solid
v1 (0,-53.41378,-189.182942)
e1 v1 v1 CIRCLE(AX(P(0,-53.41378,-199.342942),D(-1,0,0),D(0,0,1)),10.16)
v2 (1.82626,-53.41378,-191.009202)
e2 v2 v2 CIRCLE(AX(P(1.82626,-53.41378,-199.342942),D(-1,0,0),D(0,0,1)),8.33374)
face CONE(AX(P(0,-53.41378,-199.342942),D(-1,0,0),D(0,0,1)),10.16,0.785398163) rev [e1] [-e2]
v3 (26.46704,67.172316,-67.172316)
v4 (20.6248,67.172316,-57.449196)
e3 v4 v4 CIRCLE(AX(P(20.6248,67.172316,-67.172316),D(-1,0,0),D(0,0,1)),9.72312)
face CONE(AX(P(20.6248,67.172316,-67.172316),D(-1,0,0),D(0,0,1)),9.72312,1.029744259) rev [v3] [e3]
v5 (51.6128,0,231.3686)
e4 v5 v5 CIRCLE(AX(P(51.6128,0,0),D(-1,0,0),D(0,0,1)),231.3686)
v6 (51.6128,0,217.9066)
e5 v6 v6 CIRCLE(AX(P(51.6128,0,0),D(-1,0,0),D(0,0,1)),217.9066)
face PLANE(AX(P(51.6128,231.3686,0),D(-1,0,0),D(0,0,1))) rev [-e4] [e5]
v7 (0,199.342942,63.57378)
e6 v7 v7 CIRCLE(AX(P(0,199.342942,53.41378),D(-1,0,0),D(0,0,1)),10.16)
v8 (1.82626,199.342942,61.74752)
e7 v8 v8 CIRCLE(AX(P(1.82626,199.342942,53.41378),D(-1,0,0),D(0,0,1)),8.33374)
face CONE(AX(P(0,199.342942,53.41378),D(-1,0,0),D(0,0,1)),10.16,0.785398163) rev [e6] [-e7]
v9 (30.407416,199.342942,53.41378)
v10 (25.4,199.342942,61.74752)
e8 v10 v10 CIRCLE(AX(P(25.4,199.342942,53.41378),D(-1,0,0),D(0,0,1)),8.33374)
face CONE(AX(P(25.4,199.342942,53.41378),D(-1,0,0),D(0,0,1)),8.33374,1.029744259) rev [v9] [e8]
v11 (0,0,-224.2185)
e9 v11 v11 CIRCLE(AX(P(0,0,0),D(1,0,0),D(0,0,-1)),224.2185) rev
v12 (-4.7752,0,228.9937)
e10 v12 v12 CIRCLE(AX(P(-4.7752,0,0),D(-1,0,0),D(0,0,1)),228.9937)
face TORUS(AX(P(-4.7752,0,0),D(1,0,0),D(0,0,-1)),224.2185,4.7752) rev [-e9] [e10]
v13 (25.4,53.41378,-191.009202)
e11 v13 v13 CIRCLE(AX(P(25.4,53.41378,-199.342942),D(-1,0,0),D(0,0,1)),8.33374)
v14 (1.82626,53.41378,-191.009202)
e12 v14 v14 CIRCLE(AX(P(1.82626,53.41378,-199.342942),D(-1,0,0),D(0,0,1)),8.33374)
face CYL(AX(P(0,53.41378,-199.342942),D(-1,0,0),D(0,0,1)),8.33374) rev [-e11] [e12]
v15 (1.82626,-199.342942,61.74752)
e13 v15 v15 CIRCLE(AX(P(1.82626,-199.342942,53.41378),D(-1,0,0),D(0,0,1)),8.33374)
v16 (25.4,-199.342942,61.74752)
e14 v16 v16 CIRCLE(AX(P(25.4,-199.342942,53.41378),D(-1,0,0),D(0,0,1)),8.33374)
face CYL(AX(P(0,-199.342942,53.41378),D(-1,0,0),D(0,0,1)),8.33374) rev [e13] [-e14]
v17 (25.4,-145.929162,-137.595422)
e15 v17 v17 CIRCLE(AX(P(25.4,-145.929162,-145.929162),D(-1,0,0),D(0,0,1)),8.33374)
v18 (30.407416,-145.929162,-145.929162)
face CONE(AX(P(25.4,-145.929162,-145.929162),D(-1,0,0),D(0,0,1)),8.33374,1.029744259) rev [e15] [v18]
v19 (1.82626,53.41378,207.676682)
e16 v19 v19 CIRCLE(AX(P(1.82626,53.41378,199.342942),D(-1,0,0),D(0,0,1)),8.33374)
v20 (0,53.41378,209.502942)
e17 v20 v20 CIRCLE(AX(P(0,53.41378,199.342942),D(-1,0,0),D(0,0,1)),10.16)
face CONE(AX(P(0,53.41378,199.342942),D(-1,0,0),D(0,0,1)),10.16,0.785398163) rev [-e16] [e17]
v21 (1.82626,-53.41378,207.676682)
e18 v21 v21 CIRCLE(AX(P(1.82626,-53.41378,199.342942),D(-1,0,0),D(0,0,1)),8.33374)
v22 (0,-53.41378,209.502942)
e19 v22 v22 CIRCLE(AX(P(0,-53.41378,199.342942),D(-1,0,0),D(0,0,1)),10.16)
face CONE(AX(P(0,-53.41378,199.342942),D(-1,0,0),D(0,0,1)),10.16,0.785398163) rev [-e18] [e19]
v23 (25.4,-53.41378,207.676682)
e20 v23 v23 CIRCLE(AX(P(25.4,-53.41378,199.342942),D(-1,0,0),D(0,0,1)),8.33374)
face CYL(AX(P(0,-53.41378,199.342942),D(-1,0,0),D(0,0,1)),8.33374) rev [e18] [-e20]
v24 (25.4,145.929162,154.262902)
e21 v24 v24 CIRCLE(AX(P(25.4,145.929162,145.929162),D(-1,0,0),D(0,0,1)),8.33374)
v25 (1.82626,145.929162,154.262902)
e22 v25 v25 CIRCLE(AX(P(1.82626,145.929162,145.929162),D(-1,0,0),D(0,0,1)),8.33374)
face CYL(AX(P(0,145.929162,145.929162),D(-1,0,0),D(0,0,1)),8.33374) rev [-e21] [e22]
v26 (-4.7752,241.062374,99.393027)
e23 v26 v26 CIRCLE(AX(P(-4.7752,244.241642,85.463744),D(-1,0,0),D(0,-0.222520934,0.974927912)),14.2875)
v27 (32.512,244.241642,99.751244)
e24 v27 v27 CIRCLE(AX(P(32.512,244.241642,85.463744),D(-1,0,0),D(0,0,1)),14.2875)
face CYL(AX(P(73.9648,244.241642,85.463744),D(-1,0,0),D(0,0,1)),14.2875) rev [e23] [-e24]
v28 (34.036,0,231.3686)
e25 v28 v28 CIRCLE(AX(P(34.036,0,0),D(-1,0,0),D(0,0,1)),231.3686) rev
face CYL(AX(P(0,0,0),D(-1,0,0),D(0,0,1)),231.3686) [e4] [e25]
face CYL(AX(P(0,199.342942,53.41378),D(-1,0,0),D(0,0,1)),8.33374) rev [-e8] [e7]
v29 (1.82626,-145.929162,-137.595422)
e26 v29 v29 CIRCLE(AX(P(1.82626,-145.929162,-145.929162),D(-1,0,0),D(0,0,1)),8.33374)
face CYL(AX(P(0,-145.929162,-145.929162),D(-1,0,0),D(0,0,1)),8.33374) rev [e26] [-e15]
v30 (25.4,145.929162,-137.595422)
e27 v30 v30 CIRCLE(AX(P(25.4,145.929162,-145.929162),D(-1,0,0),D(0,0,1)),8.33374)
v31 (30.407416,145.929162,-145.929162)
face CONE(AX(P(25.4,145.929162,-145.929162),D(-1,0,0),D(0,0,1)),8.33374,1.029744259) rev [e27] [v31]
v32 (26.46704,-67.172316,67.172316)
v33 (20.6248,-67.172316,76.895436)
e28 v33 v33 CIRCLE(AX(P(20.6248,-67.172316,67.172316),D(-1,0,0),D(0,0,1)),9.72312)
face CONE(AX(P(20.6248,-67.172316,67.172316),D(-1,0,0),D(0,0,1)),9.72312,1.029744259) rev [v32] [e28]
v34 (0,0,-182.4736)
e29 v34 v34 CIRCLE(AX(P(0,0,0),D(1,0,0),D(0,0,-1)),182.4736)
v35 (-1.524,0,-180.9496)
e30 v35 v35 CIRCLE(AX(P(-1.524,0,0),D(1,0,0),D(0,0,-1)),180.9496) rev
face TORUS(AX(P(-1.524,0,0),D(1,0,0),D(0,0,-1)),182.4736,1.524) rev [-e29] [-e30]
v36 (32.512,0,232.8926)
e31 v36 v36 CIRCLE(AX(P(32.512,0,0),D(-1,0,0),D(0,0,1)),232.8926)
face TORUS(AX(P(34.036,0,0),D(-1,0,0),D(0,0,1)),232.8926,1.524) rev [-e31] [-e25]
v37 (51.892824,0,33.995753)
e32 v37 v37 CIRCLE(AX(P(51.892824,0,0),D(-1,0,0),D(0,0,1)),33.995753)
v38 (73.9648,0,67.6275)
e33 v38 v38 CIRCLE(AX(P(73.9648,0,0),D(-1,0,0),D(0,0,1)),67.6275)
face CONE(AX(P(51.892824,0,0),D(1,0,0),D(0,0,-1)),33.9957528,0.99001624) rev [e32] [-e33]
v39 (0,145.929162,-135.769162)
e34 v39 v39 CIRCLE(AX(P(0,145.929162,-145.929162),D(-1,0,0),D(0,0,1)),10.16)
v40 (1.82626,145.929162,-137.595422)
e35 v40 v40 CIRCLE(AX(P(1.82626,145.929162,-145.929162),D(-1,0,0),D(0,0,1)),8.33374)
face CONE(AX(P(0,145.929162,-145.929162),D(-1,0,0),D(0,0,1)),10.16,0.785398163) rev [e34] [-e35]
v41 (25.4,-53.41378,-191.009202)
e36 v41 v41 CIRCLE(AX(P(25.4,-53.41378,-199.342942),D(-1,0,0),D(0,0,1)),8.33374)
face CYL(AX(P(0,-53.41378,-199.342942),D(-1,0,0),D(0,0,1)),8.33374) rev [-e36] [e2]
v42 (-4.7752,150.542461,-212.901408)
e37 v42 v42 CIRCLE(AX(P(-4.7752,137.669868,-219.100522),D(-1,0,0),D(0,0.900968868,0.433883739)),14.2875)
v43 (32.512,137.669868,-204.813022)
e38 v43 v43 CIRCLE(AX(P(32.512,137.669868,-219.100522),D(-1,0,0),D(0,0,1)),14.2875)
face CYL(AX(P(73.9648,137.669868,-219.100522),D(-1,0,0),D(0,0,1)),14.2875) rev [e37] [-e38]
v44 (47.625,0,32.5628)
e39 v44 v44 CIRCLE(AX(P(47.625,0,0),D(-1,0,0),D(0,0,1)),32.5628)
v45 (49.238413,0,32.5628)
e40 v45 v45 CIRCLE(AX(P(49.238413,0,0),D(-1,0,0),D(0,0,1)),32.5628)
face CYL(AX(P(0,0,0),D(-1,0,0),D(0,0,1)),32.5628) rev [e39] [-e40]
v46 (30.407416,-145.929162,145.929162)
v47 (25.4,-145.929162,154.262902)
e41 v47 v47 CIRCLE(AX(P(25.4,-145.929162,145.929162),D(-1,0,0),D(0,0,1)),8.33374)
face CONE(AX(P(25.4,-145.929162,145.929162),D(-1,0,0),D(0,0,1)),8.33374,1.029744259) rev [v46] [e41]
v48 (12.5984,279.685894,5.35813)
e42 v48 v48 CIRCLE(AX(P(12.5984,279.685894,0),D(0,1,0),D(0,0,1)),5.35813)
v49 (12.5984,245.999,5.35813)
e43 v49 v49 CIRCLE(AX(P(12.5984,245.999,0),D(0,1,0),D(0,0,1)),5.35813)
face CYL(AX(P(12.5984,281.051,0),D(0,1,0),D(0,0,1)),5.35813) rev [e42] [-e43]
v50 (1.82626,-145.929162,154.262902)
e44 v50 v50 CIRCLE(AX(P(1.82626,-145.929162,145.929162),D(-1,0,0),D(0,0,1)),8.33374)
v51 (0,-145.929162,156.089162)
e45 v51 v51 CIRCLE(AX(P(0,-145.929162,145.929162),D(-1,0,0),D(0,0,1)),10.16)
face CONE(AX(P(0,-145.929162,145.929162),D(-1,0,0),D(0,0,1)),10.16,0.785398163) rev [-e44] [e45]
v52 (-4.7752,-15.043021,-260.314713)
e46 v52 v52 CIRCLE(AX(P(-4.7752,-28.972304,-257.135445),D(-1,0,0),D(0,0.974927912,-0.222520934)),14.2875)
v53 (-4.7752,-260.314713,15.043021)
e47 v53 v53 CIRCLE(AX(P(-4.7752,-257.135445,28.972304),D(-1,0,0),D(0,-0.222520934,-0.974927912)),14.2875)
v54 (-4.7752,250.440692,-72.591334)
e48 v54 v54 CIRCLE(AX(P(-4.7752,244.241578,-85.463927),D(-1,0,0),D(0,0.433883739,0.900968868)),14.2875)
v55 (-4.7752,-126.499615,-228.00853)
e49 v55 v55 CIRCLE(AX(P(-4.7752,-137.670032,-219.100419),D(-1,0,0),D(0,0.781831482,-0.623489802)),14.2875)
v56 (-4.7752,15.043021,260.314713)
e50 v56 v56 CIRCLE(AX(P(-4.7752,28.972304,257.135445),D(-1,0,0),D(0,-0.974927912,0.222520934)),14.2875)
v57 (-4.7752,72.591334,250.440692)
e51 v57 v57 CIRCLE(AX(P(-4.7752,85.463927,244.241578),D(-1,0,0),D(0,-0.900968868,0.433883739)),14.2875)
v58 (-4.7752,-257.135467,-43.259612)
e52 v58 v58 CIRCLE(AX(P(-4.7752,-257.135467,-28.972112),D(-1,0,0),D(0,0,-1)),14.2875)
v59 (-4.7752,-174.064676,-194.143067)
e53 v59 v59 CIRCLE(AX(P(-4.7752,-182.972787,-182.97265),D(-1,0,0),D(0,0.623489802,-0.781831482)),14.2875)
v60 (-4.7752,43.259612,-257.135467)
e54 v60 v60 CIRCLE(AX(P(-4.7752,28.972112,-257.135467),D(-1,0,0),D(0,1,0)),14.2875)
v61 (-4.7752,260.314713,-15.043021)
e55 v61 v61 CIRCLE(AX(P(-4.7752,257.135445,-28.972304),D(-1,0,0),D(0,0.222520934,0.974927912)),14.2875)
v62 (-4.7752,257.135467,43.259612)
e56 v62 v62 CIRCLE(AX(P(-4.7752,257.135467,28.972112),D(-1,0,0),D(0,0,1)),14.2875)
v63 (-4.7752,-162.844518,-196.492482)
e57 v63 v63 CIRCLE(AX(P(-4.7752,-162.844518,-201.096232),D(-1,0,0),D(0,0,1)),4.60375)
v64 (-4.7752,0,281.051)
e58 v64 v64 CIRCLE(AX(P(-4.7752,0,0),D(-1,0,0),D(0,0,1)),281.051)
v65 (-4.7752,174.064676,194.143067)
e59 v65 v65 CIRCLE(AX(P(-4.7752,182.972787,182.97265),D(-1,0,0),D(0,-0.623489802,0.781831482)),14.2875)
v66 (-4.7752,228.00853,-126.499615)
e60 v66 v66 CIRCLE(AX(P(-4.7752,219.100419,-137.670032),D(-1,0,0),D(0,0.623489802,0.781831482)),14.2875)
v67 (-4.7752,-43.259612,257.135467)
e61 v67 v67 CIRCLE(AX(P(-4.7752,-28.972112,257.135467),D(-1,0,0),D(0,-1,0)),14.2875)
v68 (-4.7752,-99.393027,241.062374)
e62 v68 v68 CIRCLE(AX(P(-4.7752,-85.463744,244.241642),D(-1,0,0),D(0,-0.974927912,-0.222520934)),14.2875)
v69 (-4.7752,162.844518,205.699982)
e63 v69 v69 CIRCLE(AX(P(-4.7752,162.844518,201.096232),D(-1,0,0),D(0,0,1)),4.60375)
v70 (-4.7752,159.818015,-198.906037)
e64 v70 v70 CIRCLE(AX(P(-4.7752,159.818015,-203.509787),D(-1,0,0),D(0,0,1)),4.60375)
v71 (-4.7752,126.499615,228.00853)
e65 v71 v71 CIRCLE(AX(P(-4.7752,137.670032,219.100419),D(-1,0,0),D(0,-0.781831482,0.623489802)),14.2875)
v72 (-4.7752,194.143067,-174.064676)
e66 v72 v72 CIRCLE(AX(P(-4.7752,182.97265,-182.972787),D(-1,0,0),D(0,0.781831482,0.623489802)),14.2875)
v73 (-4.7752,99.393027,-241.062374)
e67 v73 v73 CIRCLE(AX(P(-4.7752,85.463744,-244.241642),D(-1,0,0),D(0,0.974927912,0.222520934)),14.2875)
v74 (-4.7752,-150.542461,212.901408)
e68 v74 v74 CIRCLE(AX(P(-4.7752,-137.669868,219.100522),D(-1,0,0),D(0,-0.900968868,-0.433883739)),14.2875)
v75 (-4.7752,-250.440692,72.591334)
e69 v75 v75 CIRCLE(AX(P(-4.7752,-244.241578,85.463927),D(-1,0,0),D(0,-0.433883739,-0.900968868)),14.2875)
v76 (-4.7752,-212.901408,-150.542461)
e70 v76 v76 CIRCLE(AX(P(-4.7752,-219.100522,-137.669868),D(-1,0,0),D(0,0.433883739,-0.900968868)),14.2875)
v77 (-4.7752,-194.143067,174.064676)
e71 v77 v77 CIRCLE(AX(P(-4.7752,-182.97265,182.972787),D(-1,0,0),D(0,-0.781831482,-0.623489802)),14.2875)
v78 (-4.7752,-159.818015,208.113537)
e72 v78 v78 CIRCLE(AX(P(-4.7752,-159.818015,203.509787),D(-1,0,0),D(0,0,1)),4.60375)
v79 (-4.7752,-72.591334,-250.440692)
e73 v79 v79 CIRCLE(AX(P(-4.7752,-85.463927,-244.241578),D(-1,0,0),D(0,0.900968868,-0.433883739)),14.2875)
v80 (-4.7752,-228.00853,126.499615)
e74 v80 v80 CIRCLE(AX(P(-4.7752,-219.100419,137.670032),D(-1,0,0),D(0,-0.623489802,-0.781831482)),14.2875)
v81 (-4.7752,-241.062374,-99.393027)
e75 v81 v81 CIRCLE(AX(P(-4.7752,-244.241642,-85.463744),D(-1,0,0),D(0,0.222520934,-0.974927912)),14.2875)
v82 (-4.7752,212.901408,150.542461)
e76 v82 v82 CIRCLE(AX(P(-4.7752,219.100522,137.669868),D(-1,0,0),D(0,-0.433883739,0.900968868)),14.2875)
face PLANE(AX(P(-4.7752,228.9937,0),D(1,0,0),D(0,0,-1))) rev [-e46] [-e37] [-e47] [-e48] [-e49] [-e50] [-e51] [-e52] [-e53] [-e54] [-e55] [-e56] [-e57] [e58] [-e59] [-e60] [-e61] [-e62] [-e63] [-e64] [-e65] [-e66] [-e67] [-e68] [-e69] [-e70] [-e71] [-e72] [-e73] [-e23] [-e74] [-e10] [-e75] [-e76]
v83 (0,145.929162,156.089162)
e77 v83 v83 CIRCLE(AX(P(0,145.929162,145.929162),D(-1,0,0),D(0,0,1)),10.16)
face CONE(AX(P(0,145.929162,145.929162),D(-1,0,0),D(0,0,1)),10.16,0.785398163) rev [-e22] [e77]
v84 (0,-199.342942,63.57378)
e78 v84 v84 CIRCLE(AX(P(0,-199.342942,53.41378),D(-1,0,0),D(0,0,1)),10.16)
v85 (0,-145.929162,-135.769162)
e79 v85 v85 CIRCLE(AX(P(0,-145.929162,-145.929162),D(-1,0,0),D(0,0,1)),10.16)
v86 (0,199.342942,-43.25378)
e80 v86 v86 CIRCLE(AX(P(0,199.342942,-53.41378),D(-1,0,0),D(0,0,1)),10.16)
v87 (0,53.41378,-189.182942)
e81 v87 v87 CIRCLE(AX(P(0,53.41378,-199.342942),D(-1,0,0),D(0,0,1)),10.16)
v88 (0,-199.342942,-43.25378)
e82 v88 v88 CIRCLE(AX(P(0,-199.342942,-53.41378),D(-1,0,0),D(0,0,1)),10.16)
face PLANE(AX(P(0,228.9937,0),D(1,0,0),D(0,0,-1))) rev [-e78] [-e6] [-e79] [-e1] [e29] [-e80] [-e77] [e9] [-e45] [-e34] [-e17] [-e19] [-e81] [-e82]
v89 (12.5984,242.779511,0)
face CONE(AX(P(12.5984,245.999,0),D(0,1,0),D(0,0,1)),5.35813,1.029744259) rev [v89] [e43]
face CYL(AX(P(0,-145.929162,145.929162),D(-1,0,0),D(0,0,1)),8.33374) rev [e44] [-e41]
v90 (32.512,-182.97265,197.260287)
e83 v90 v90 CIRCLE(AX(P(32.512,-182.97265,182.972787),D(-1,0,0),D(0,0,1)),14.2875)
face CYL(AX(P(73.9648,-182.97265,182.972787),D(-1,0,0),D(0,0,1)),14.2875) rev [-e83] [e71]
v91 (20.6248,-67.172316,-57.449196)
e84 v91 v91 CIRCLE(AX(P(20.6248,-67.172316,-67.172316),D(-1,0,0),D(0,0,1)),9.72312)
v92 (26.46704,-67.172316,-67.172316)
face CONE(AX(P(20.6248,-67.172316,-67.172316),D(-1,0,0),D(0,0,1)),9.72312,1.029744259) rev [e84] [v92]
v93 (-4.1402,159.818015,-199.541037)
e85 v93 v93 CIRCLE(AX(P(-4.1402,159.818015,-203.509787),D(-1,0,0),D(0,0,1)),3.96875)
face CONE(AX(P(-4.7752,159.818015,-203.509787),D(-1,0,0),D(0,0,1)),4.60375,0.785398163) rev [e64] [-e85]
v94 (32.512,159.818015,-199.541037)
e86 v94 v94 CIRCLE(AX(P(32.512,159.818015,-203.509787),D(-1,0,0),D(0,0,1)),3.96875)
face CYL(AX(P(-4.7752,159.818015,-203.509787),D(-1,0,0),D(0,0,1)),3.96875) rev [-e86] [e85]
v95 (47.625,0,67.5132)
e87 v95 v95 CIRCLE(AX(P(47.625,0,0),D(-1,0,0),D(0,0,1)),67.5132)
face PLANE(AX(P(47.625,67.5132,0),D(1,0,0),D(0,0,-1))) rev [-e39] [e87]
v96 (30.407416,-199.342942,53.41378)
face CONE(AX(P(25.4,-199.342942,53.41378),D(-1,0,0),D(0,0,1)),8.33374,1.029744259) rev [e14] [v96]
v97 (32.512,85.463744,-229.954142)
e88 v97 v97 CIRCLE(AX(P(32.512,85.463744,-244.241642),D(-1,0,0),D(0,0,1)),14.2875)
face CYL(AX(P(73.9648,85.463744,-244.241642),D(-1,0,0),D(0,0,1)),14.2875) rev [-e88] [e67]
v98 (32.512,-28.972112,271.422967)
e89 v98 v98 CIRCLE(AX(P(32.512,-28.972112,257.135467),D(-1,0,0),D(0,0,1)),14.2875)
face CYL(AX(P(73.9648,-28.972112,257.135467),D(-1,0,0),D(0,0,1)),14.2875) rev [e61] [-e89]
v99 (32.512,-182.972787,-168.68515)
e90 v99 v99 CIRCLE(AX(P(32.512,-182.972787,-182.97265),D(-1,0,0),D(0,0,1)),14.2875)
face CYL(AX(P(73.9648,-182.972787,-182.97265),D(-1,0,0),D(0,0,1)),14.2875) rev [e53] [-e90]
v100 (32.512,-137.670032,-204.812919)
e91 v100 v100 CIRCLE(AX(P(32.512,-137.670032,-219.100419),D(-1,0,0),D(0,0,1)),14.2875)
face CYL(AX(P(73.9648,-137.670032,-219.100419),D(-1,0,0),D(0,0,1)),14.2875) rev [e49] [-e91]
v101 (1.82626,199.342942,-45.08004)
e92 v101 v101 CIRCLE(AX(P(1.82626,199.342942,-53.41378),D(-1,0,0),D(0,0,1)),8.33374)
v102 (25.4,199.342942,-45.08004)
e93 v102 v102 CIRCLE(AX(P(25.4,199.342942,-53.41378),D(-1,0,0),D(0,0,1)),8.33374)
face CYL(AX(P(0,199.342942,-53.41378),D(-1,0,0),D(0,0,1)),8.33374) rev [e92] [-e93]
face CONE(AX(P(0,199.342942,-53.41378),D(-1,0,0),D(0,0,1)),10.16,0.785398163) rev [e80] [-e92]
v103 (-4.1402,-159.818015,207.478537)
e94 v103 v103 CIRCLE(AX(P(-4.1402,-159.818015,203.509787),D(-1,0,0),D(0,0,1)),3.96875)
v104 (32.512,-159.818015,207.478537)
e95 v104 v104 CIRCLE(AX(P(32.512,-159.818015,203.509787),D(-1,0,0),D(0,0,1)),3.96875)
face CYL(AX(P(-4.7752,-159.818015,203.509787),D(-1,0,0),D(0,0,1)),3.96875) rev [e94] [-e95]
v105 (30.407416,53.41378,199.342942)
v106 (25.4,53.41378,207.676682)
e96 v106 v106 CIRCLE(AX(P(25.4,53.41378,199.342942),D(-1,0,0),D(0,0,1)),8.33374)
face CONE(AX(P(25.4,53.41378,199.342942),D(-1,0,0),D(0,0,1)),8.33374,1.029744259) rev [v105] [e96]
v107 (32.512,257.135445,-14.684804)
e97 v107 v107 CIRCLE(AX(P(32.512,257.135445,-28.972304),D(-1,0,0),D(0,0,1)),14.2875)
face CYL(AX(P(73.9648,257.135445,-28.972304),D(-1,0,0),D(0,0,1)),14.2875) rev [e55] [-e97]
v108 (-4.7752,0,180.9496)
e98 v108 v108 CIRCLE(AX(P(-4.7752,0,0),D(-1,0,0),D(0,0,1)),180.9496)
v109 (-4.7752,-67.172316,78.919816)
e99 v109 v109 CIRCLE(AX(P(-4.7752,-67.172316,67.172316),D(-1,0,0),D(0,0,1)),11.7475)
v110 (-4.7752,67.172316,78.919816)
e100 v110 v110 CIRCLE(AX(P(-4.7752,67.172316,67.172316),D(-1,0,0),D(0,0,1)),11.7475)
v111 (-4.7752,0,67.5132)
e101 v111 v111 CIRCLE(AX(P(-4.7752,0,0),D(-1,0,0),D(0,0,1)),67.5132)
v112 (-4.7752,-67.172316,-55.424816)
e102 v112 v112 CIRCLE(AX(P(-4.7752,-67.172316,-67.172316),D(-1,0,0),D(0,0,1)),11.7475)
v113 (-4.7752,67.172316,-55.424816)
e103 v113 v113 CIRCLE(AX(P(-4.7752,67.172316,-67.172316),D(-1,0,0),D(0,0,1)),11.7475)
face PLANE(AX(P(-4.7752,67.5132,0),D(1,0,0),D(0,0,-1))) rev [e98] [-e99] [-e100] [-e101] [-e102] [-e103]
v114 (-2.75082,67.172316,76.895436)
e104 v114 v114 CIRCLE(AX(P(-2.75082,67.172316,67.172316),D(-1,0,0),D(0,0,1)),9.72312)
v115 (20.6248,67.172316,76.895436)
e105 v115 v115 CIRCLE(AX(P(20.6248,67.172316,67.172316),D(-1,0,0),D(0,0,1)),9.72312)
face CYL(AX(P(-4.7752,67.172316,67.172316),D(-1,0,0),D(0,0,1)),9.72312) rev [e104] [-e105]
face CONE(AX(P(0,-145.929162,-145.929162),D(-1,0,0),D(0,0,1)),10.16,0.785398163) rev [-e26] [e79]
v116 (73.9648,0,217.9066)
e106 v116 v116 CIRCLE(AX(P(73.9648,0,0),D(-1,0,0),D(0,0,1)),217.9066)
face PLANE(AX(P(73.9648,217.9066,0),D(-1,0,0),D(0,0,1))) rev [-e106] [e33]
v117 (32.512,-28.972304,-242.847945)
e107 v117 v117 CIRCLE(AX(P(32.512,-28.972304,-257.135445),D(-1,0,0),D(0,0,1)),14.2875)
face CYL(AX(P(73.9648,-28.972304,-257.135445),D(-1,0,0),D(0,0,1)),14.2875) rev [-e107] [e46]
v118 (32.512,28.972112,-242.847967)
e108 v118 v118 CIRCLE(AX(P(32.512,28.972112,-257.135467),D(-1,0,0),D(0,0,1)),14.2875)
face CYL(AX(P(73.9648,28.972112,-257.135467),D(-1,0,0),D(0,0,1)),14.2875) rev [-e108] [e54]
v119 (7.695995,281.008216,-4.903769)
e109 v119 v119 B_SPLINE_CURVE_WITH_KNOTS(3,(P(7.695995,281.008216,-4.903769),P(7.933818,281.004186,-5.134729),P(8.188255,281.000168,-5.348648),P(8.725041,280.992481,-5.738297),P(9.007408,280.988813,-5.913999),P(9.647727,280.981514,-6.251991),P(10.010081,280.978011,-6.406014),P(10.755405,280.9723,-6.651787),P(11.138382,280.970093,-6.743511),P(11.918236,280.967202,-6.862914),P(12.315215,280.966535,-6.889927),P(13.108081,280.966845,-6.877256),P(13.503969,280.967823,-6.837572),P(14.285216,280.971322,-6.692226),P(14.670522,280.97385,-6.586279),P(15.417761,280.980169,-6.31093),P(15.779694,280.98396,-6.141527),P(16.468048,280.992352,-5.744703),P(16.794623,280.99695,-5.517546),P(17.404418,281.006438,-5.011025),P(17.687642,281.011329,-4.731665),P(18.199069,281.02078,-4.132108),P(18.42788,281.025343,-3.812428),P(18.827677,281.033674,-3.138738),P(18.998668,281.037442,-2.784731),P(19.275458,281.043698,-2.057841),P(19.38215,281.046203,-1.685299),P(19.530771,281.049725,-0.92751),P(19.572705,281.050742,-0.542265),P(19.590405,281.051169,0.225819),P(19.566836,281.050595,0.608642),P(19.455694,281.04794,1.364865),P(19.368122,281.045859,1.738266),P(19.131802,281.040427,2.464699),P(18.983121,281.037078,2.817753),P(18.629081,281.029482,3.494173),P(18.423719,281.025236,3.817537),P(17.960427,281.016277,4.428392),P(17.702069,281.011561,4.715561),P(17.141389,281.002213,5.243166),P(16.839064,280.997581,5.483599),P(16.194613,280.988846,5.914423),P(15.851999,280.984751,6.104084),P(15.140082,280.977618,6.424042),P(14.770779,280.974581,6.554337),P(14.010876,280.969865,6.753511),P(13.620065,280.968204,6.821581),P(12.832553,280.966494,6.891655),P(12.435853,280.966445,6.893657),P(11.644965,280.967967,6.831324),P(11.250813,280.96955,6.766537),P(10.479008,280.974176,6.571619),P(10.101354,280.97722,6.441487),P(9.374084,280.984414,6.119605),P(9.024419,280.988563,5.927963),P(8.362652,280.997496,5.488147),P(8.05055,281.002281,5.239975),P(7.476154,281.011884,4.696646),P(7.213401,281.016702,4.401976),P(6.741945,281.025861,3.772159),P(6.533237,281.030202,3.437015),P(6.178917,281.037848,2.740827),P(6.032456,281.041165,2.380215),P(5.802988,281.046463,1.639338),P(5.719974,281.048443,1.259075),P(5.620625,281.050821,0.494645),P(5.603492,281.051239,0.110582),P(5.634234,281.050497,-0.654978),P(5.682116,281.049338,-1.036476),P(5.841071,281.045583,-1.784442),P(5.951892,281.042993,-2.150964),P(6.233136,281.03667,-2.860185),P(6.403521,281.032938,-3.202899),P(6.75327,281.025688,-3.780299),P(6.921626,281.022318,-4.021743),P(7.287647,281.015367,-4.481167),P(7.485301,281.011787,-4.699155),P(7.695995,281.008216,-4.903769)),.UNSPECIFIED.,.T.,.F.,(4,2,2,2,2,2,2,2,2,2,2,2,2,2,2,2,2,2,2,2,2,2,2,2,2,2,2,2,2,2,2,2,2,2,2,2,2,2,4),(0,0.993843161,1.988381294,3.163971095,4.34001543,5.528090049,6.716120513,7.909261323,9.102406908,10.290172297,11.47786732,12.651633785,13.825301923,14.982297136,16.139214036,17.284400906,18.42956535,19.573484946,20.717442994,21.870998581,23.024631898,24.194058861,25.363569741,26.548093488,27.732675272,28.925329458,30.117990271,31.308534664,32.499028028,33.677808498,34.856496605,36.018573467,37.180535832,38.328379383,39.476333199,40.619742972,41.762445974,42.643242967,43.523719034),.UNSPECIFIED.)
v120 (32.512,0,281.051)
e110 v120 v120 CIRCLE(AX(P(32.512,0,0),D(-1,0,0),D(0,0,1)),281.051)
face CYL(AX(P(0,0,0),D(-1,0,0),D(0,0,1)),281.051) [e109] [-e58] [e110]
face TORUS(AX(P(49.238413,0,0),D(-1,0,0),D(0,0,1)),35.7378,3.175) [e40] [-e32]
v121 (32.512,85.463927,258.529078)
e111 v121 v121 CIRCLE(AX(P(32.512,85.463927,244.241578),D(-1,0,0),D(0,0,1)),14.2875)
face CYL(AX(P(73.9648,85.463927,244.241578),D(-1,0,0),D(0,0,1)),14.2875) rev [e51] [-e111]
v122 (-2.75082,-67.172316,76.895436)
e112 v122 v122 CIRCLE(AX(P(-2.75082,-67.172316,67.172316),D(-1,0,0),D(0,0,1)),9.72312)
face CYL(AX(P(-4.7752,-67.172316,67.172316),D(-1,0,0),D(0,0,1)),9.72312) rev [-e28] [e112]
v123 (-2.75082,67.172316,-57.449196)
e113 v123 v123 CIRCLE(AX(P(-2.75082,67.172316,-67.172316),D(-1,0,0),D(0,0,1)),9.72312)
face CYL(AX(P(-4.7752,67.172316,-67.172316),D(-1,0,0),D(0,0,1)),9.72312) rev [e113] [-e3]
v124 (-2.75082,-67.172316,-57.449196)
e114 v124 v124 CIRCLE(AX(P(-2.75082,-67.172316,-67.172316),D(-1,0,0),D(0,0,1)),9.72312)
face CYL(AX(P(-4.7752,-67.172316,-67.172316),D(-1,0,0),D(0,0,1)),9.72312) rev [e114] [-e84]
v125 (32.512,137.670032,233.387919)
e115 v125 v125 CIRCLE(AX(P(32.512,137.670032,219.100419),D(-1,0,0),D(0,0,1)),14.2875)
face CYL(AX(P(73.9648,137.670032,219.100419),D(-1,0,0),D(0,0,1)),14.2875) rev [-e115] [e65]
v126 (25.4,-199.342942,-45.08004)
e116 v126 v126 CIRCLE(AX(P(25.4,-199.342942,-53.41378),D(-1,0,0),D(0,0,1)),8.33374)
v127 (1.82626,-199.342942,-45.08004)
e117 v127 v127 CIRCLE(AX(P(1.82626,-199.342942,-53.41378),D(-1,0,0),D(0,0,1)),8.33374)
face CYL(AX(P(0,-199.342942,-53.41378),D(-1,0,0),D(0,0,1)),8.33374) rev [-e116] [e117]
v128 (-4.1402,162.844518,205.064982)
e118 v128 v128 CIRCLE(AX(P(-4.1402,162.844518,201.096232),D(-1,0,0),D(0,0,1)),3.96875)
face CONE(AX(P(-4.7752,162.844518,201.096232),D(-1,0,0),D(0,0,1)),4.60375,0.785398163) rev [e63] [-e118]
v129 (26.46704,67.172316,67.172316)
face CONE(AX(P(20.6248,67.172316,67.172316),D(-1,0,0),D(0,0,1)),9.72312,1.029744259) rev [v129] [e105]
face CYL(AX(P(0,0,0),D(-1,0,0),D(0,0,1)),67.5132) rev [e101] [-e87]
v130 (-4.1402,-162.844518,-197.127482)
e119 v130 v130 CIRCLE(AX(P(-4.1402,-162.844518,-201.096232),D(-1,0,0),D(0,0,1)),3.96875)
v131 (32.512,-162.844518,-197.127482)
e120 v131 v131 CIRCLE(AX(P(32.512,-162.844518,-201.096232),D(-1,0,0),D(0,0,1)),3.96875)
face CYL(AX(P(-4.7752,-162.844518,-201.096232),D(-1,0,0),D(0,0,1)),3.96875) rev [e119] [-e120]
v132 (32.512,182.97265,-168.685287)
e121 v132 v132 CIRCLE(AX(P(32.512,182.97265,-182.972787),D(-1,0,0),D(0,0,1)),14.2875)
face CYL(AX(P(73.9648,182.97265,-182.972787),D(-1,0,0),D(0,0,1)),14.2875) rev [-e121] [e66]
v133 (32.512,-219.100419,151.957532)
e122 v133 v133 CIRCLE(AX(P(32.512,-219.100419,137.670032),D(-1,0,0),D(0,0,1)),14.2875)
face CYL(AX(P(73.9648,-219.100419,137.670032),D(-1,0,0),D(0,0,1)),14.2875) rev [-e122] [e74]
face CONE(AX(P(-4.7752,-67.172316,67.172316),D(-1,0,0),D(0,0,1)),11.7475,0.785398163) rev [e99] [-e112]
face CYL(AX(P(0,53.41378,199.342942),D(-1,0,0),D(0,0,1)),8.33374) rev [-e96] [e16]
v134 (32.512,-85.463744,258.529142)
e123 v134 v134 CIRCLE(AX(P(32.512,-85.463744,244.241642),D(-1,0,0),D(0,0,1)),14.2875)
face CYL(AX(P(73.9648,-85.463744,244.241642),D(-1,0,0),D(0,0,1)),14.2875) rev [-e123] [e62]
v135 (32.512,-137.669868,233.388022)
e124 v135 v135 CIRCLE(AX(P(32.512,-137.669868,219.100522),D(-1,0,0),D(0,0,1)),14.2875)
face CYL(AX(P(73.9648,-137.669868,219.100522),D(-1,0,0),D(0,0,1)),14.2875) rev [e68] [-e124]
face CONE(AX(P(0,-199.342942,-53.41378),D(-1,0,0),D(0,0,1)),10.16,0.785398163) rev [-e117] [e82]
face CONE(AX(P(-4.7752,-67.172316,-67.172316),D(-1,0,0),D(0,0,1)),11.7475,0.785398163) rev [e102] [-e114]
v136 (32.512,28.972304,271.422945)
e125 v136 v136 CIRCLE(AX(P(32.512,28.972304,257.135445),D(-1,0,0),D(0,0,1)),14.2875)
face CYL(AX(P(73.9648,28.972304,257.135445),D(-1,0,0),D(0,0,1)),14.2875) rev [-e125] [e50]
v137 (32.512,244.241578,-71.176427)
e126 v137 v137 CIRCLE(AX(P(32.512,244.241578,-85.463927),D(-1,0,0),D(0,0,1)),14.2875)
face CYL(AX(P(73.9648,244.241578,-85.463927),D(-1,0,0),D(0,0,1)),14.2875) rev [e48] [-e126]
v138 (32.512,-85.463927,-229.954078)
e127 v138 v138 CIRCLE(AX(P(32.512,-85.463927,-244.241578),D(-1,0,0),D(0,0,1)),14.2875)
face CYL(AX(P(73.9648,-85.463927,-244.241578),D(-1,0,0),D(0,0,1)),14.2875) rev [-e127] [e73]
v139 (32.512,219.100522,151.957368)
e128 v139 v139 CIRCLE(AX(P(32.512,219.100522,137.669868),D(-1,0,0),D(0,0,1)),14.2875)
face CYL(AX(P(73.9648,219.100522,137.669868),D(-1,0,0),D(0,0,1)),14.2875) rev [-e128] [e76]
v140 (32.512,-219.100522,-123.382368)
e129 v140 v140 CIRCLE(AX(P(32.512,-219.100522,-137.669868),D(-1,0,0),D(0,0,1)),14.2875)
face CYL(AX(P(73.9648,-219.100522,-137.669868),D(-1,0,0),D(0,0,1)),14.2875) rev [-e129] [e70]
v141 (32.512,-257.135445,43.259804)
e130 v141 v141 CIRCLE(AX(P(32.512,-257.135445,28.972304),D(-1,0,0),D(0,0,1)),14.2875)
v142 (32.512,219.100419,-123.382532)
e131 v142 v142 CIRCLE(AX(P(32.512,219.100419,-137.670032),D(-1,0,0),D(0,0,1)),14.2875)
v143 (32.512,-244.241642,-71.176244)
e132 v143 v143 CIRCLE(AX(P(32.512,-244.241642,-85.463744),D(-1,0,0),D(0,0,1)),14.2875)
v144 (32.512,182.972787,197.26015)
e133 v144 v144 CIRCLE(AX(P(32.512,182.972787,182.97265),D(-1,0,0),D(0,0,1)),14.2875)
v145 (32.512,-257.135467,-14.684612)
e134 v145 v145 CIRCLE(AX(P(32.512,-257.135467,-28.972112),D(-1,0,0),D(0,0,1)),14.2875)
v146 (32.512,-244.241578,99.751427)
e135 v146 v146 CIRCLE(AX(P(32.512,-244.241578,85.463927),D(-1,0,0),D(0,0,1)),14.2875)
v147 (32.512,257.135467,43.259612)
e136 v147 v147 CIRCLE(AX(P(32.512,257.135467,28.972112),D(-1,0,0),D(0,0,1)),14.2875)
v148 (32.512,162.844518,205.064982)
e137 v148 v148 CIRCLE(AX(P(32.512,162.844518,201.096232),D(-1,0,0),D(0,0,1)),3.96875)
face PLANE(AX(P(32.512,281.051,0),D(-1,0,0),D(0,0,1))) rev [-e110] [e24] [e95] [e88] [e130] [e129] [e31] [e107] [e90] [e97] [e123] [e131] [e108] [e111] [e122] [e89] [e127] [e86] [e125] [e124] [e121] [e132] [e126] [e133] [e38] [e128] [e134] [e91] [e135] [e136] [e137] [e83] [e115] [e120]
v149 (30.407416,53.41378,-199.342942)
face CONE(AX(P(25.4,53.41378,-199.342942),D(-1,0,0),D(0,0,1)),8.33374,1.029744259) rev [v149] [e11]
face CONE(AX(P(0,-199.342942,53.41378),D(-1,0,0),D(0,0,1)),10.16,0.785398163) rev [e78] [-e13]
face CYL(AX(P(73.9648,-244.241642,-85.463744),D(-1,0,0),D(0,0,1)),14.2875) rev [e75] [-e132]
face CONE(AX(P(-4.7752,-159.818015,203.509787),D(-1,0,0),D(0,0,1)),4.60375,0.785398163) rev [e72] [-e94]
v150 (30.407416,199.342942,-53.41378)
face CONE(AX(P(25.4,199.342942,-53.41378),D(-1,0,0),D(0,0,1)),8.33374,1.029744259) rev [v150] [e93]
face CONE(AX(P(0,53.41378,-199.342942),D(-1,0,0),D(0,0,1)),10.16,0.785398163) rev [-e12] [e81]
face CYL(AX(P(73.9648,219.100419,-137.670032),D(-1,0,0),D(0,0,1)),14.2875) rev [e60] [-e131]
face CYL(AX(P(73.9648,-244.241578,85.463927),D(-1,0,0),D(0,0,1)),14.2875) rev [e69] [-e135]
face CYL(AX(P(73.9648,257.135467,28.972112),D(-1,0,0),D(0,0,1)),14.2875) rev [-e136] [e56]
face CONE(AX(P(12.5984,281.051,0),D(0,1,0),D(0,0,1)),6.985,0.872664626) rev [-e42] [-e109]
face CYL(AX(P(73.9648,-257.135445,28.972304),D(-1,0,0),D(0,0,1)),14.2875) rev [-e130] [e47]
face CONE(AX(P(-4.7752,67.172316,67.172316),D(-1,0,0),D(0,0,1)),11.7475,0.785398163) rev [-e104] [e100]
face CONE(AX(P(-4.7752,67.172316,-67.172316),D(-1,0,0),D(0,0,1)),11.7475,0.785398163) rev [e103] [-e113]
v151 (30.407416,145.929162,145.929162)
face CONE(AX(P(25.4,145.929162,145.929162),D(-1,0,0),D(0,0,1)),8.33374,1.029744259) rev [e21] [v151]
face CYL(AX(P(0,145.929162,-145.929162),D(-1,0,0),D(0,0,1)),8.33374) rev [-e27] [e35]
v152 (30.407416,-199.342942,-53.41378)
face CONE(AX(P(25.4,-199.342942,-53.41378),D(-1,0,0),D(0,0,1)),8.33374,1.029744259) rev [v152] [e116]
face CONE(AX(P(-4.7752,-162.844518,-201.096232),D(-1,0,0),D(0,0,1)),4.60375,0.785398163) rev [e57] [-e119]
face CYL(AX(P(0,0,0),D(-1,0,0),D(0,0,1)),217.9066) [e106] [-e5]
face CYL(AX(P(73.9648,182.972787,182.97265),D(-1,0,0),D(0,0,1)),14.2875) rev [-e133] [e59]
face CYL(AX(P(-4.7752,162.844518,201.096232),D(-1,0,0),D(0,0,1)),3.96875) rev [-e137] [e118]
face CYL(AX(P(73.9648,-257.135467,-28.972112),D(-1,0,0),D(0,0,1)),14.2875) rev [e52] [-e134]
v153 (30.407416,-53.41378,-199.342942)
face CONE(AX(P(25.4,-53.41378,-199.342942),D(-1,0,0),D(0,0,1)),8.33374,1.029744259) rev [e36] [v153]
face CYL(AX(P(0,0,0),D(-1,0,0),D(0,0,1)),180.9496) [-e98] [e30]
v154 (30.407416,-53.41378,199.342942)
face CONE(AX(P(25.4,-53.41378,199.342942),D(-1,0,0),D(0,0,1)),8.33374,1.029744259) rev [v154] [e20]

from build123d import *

# Parameters (mm, degrees)
SKETCH4_R                         = 14.2875
CUT_EXTRUDE1_DEPTH                = 406.190469782
CIRPATTERN2_COUNT                 = 28
CIRPATTERN3_COUNT                 = 12
CIRPATTERN4_COUNT                 = 4
CIRPATTERN5_COUNT                 = 56
F_1_2_13_TAPPED_HOLE4_D           = 10.71626
F_1_2_13_TAPPED_HOLE4_DEPTH       = 35.052
F_1_2_13_TAPPED_HOLE4_CSINK_D     = 13.97
F_1_2_13_TAPPED_HOLE4_CSINK_ANGLE = 100
F_1_2_13_TAPPED_HOLE4_TIP         = 3.219489309
FILLET1_R                         = 1.524
FILLET2_R                         = 4.7752
FILLET3_R                         = 1.524


with BuildPart() as part:
    # Sketch1 → Revolve1 (revolve)
    with BuildSketch(Plane.XY, mode=Mode.PRIVATE) as revolve1_sk:
        with BuildLine():
            Line((-4.7752, 67.5132), (-4.7752, 180.9496))
            Line((-4.7752, 180.9496), (0, 180.9496))
            Line((0, 180.9496), (0, 228.9937))
            Line((0, 228.9937), (-4.7752, 228.9937))
            Line((-4.7752, 228.9937), (-4.7752, 281.051))
            Line((-4.7752, 281.051), (32.512, 281.051))
            Line((32.512, 281.051), (32.512, 231.3686))
            Line((32.512, 231.3686), (51.6128, 231.3686))
            Line((51.6128, 231.3686), (51.6128, 217.9066))
            Line((51.6128, 217.9066), (73.9648, 217.9066))
            Line((73.9648, 217.9066), (73.9648, 67.6275))
            Line((73.9648, 67.6275), (51.892823931, 33.9957528))
            ThreePointArc((51.892823931, 33.9957528), (50.746661337, 32.943911593), (49.238413158, 32.5628))
            Line((49.238413158, 32.5628), (47.625, 32.5628))
            Line((47.625, 32.5628), (47.625, 67.5132))
            Line((47.625, 67.5132), (-4.7752, 67.5132))
        make_face()
    revolve(revolve1_sk.sketch.rotate(Axis((0, 0, 0), (1, 0, 0)), 90), axis=Axis((0, 0, 0), (1, 0, 0)))

    # Sketch4 → Cut-Extrude1 (cut, through all)
    with BuildSketch(Plane.ZY.offset(4.7752)):
        with Locations((28.972111579, 257.135466548)):
            Circle(SKETCH4_R)
    cut_extrude1 = extrude(amount=-CUT_EXTRUDE1_DEPTH, mode=Mode.SUBTRACT)

    # CirPattern2: Cut-Extrude1 ×28 about axis
    cirpattern2_axis = Axis((0, 0, 0), (1, 0, 0))
    for i in range(1, CIRPATTERN2_COUNT):
        add(cut_extrude1.rotate(cirpattern2_axis, i * 360 / CIRPATTERN2_COUNT), mode=Mode.SUBTRACT)

    # Sketch8 → 3/4-10 Tapped Hole1 (revolve, cut)
    with BuildSketch(Plane(origin=(0, 199.3429424, 53.413780433), x_dir=(0, 0, 1), z_dir=(0, 1, 0))):
        Polygon((0, 0), (0, 30.407416175), (8.33374, 25.4), (8.33374, 1.82626), (10.16, 0), align=None)
    f_3_4_10_tapped_hole1 = revolve(axis=Axis((-6.35, 199.3429424, 53.413780433), (1, 0, 0)), mode=Mode.SUBTRACT)

    # CirPattern3: 3/4-10 Tapped Hole1 ×12 about axis
    cirpattern3_axis = Axis((0, 0, 0), (1, 0, 0))
    for i in range(1, CIRPATTERN3_COUNT):
        add(f_3_4_10_tapped_hole1.rotate(cirpattern3_axis, i * 360 / CIRPATTERN3_COUNT), mode=Mode.SUBTRACT)

    # Sketch10 → 7/8-9 Tapped Hole1 (revolve, cut)
    with BuildSketch(Plane(origin=(-4.7752, 67.172315786, 67.172315786), x_dir=(0, 0, 1), z_dir=(0, 1, 0))):
        Polygon((0, 0), (0, 31.242239902), (9.72312, 25.4), (9.72312, 2.02438), (11.7475, 0), align=None)
    f_7_8_9_tapped_hole1 = revolve(axis=Axis((-11.1252, 67.172315786, 67.172315786), (1, 0, 0)), mode=Mode.SUBTRACT)

    # CirPattern4: 7/8-9 Tapped Hole1 ×4 about axis
    cirpattern4_axis = Axis((0, 0, 0), (1, 0, 0))
    for i in range(1, CIRPATTERN4_COUNT):
        add(f_7_8_9_tapped_hole1.rotate(cirpattern4_axis, i * 360 / CIRPATTERN4_COUNT), mode=Mode.SUBTRACT)

    # Sketch21 → Tap Drill for 3/8-16 Tap1 (revolve, cut)
    with BuildSketch(Plane(origin=(-4.7752, 162.844517689, 201.096231852), x_dir=(0, 0, 1), z_dir=(0, 1, 0))):
        Polygon((0, 0), (0, 43.024665582), (3.96875, 40.64), (3.96875, 0.635), (4.60375, 0), align=None)
    tap_drill_for_3_8_16_tap1 = revolve(axis=Axis((-11.1252, 162.844517689, 201.096231852), (1, 0, 0)), mode=Mode.SUBTRACT)

    # CirPattern5: Tap Drill for 3/8-16 Tap1 ×56 about axis, 52 skipped
    cirpattern5_axis = Axis((0, 0, 0), (-1, 0, 0))
    add([tap_drill_for_3_8_16_tap1.rotate(cirpattern5_axis, i * 360 / CIRPATTERN5_COUNT) for i in range(1, CIRPATTERN5_COUNT) if i not in (1, 2, 3, 4, 5, 6, 7, 8, 9, 10, 11, 12, 13, 14, 15, 17, 18, 19, 20, 21, 22, 23, 24, 25, 26, 27, 29, 30, 31, 32, 33, 34, 35, 36, 37, 38, 39, 40, 41, 42, 43, 45, 46, 47, 48, 49, 50, 51, 52, 53, 54, 55)], mode=Mode.SUBTRACT)

    # 1/2-13 Tapped Hole4
    with Locations(Plane(origin=(12.5984, 281.051, 0), x_dir=(0, 0, 1), z_dir=(0, 1, 0))):
        with Locations((0, 0)):
            CounterSinkHole(F_1_2_13_TAPPED_HOLE4_D / 2, F_1_2_13_TAPPED_HOLE4_CSINK_D / 2, depth=F_1_2_13_TAPPED_HOLE4_DEPTH, counter_sink_angle=F_1_2_13_TAPPED_HOLE4_CSINK_ANGLE)
            with Locations((0, 0, -(F_1_2_13_TAPPED_HOLE4_DEPTH + F_1_2_13_TAPPED_HOLE4_TIP / 2))):  # 118° drill point
                Cone(0, F_1_2_13_TAPPED_HOLE4_D / 2, F_1_2_13_TAPPED_HOLE4_TIP, mode=Mode.SUBTRACT)

    # Fillet1
    fillet1_edges = [part.edges().sort_by_distance(p)[0] for p in [
        (32.512, 0, -231.3686),
    ]]
    fillet(fillet1_edges, radius=FILLET1_R)

    # Fillet2
    fillet2_edges = [part.edges().sort_by_distance(p)[0] for p in [
        (0, 0, -228.9937),
    ]]
    fillet(fillet2_edges, radius=FILLET2_R - 0.0001)  # a hair under: the kernel refuses the full size

    # Fillet3
    fillet3_edges = [part.edges().sort_by_distance(p)[0] for p in [
        (0, 0, -180.9496),
    ]]
    fillet(fillet3_edges, radius=FILLET3_R)


solid = part.part
